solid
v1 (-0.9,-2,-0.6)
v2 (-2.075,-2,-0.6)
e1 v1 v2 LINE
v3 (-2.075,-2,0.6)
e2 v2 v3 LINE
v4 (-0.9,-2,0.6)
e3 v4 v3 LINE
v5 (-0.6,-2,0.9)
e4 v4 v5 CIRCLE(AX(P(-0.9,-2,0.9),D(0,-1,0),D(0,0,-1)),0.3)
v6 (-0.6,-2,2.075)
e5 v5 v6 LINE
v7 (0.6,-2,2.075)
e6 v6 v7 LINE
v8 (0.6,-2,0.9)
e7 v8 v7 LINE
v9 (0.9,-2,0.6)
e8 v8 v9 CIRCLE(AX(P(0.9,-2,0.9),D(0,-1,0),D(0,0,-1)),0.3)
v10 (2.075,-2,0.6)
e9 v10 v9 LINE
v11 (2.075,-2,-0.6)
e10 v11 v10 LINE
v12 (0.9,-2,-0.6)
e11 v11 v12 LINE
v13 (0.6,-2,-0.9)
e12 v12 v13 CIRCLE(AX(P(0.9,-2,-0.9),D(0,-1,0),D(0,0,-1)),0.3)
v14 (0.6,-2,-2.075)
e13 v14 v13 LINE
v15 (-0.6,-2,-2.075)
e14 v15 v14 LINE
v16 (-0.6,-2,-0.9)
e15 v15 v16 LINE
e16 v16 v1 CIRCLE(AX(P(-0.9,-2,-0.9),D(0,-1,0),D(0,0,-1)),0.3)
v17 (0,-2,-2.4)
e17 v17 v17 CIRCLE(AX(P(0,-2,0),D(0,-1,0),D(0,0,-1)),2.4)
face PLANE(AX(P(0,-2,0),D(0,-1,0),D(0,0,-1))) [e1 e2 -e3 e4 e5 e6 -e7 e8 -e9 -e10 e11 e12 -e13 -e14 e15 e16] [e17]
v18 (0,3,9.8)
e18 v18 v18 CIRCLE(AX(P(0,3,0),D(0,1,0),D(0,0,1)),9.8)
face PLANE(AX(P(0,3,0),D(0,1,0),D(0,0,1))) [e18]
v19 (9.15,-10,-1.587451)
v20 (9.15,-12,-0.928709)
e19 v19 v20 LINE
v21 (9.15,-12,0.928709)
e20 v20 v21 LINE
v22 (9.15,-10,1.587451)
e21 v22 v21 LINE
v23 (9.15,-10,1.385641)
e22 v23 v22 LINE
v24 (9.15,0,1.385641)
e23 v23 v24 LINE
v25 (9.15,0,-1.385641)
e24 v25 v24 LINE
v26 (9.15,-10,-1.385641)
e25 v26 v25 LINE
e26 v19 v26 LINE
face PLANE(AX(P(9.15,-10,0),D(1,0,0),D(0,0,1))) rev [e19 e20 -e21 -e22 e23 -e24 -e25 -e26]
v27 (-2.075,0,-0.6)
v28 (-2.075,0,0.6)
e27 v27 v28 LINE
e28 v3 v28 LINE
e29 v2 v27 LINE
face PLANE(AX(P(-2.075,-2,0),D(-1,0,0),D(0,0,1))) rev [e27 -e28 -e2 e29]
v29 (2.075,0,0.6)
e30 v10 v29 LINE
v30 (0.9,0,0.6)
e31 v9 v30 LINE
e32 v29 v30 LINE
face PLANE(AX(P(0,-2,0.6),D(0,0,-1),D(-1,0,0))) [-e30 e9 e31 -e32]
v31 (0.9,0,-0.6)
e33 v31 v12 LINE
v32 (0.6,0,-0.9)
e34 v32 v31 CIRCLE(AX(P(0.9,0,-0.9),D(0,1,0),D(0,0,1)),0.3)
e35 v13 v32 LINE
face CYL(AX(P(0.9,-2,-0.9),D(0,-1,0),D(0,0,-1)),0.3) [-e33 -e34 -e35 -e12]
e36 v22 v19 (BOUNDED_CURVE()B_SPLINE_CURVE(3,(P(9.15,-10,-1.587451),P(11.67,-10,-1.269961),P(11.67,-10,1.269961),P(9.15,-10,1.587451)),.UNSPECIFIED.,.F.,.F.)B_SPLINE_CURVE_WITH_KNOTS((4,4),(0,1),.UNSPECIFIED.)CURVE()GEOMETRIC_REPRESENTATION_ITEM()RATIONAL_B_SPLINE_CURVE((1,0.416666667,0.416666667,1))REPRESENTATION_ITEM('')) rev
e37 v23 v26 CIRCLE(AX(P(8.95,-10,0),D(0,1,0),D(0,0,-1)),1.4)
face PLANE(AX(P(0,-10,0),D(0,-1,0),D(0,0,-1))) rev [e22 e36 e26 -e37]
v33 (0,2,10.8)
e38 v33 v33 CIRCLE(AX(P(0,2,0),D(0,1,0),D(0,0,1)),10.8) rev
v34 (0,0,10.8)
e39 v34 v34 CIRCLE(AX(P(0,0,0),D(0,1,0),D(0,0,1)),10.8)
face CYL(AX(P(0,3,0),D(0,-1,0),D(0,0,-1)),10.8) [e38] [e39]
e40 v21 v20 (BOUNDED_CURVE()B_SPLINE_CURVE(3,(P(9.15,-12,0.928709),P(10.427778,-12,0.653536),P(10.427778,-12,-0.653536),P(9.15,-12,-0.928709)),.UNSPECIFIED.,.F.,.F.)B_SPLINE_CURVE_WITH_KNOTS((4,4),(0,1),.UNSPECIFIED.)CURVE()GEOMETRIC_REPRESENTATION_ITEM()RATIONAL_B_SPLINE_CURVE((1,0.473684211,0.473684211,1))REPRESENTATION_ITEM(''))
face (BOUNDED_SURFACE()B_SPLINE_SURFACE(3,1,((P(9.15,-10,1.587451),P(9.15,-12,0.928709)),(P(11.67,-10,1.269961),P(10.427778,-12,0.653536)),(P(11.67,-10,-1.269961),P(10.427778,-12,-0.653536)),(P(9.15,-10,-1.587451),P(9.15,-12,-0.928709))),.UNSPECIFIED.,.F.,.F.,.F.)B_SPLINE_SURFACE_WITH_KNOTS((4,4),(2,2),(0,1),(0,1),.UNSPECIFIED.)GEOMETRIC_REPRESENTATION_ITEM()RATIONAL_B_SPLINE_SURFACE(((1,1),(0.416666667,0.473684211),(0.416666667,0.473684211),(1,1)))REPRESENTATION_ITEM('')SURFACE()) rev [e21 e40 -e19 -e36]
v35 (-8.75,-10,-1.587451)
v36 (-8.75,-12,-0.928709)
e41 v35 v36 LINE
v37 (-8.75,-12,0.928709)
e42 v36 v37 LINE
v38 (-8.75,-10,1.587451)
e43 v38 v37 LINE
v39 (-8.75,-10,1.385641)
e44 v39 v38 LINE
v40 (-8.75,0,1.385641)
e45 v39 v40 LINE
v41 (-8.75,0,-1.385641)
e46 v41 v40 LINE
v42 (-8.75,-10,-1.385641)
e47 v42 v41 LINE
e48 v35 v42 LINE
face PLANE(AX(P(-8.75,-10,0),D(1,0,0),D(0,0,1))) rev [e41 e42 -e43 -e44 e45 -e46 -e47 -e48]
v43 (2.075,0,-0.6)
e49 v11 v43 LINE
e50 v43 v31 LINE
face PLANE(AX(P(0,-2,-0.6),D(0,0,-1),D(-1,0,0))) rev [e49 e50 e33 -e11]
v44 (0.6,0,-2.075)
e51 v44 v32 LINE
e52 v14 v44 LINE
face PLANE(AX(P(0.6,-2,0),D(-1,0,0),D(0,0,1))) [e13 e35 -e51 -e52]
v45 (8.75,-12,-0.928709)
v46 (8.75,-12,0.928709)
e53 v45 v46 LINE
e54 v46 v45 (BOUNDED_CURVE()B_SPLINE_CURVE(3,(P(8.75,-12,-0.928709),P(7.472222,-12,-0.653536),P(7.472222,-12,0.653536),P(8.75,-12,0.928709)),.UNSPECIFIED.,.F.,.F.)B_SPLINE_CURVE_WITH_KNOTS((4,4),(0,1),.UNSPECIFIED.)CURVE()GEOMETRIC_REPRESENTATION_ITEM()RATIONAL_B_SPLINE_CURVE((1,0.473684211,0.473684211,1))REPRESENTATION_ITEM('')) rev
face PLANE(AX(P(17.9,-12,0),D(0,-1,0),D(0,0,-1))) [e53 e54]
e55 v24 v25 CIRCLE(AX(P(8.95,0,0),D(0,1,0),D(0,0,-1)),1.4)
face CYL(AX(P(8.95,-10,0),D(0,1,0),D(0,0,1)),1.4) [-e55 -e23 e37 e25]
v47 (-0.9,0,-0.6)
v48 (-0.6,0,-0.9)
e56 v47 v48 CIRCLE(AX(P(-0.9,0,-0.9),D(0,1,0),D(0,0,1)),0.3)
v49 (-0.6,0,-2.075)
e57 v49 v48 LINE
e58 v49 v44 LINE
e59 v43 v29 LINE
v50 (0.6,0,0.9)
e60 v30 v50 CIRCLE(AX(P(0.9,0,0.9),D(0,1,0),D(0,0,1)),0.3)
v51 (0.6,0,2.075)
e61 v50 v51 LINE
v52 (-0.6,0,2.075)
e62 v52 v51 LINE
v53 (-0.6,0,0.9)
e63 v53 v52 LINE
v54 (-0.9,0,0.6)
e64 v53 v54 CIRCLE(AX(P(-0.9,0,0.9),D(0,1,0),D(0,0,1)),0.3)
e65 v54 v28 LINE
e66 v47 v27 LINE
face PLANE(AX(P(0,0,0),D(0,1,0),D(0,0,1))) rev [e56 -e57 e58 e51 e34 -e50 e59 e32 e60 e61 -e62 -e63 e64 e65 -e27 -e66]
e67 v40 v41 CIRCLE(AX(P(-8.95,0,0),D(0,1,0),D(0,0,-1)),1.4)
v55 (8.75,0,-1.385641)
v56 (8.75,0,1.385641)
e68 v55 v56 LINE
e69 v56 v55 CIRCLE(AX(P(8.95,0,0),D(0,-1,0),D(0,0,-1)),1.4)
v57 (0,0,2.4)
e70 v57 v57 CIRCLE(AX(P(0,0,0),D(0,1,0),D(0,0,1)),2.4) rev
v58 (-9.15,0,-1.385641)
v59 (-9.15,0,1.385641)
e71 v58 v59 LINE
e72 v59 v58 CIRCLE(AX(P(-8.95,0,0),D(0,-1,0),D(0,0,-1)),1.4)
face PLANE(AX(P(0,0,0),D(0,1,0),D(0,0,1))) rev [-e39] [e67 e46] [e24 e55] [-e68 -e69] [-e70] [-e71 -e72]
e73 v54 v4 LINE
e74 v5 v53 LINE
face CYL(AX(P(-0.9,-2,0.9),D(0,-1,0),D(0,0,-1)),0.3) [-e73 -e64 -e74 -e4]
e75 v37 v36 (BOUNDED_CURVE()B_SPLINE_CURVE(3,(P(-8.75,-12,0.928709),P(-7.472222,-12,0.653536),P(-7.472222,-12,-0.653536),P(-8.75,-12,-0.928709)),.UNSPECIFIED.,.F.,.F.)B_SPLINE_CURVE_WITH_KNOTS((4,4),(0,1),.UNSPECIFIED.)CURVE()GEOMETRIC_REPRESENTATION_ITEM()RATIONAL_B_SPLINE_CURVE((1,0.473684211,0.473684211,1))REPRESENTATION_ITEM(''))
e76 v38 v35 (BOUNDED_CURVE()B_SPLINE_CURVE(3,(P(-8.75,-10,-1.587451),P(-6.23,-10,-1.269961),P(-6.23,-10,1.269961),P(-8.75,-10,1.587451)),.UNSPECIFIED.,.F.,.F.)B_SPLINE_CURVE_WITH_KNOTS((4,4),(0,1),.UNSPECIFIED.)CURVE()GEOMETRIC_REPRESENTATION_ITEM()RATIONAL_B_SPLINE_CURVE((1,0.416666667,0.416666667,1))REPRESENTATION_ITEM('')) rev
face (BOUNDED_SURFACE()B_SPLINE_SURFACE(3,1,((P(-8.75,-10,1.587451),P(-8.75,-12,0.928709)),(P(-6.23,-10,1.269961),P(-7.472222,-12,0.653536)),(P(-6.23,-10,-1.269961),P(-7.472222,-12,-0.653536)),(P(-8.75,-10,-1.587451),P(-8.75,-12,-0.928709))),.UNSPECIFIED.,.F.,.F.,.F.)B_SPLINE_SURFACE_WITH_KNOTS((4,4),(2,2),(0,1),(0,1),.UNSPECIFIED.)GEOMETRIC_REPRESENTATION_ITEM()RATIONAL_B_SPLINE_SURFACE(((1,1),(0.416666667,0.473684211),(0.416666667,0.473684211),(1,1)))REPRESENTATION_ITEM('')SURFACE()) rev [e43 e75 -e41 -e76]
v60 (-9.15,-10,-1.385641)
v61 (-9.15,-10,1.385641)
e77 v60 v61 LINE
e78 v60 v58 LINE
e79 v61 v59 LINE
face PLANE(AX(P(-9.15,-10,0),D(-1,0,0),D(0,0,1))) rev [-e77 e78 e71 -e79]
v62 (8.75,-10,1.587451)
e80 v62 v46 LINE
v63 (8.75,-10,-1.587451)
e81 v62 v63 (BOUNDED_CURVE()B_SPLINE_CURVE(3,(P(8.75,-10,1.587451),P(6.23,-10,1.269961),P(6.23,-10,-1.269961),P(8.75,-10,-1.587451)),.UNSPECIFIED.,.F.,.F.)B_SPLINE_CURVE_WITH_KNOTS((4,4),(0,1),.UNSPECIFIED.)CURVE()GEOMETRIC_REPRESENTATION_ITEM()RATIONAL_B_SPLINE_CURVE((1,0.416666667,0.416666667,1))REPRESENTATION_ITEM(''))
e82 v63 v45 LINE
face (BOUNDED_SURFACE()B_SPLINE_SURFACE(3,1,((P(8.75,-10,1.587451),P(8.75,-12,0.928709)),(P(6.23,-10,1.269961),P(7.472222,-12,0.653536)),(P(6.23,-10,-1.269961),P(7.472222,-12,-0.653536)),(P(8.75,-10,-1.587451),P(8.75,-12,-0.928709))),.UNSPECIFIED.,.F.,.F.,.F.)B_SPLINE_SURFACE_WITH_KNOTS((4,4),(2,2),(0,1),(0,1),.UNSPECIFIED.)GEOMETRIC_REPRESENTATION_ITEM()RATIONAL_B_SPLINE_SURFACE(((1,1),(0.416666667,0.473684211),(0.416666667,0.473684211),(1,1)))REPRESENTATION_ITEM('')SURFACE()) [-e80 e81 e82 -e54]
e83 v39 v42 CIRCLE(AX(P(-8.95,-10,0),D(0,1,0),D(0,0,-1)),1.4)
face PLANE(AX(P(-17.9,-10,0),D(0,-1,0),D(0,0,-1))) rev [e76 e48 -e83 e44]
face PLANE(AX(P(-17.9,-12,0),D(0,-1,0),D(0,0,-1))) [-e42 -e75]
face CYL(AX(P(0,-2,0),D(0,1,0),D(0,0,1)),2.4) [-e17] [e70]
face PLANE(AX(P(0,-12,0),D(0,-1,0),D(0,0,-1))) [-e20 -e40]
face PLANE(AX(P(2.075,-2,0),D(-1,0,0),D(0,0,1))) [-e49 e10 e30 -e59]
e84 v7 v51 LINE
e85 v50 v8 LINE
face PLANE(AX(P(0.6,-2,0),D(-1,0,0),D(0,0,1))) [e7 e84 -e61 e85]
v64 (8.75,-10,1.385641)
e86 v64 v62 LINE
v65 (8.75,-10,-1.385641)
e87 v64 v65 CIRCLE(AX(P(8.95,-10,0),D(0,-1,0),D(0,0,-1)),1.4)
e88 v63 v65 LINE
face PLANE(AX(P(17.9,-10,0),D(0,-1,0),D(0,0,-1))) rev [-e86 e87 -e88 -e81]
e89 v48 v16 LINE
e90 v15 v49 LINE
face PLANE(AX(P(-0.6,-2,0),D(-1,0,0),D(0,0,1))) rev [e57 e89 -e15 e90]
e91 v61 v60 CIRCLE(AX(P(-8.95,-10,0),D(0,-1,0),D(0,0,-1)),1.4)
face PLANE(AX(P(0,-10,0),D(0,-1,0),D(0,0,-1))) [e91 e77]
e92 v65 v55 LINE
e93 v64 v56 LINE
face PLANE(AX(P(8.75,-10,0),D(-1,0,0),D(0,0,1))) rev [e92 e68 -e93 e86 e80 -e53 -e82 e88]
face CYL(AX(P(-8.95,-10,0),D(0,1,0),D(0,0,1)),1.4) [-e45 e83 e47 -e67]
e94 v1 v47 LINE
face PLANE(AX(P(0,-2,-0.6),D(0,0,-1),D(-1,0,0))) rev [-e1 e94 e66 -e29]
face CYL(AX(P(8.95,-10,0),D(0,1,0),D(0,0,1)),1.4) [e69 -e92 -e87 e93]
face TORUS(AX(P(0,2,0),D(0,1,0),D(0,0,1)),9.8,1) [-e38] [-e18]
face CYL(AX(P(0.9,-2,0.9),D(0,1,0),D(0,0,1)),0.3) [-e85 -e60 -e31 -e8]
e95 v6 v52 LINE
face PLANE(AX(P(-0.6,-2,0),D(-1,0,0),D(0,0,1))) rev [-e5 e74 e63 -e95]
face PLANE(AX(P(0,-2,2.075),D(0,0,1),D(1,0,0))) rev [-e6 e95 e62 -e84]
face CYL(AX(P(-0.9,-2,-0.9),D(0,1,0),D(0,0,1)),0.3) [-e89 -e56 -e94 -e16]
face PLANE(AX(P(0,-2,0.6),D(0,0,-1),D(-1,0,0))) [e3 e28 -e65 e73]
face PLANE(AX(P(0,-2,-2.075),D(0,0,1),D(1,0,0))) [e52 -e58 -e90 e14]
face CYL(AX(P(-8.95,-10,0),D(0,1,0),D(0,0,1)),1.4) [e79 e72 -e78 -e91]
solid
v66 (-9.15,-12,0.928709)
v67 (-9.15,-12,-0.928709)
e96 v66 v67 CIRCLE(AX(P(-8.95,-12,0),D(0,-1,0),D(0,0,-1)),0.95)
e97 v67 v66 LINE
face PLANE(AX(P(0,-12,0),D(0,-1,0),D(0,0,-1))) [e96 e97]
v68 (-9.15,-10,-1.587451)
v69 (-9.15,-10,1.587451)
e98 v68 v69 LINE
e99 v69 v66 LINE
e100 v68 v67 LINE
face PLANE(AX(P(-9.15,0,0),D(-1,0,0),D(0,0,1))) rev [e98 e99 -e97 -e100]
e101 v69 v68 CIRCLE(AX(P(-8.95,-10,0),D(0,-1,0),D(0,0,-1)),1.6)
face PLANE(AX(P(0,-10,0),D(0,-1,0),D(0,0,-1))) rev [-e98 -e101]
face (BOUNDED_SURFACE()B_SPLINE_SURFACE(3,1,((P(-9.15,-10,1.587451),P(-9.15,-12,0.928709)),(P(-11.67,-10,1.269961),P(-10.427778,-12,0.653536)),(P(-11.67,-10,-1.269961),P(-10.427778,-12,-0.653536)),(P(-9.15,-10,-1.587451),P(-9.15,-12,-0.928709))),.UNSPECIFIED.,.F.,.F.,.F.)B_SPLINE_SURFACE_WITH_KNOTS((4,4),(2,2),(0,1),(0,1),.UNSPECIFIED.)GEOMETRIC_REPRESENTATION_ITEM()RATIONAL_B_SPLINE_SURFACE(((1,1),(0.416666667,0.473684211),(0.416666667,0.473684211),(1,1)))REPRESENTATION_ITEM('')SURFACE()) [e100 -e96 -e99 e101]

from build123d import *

# Parameters (mm, degrees)
SKETCH1_R           = 10.8
BOSS_EXTRUDE1_DEPTH = 3
BOSS_EXTRUDE3_DEPTH = 10
MIRROR3_START       = -10
MIRROR3_DEPTH       = 10
FILLET1_R           = 1
SKETCH6_R           = 2.4
BOSS_EXTRUDE4_DEPTH = 2
FILLET2_R           = 0.3


with BuildPart() as part:
    # Sketch1 → Boss-Extrude1 (new body)
    with BuildSketch(Plane(origin=(0, 0, 0), x_dir=(1, 0, 0), z_dir=(0, 1, 0))):
        with Locations(Location((0, 0, 0), (0, 0, 270))):
            Circle(SKETCH1_R)
    extrude(amount=BOSS_EXTRUDE1_DEPTH)

    # Sketch2 → Boss-Extrude3 (add)
    with BuildSketch(Plane.XZ):
        with BuildLine():
            Line((-9.15, 0), (-9.15, 1.385640646))
            ThreePointArc((-9.15, 1.385640646), (-10.35, 0), (-9.15, -1.385640646))
            Line((-9.15, -1.385640646), (-9.15, 0))
        make_face()
    boss_extrude3 = extrude(amount=BOSS_EXTRUDE3_DEPTH)


with BuildPart() as body_2:
    # Loft3: read off the stored shape, not the designer's step
    # Loft3: loft between two sections, ruled curve by curve
    loft3_from = [
        Edge.make_bspline([(-9.15, -10, 1.587450787), (-11.67, -10, 1.269960629), (-11.67, -10, -1.269960629), (-9.15, -10, -1.587450787)], [0, 0, 0, 0, 1, 1, 1, 1], 3, [1, 0.416666667, 0.416666667, 1]),
        Edge.make_line((-9.15, -10, 1.587450787), (-9.15, -10, -1.587450787)),
    ]
    loft3_to = [
        Edge.make_bspline([(-9.15, -12, 0.928708781), (-10.427777778, -12, 0.653535809), (-10.427777778, -12, -0.653535809), (-9.15, -12, -0.928708781)], [0, 0, 0, 0, 1, 1, 1, 1], 3, [1, 0.473684211, 0.473684211, 1]),
        Edge.make_line((-9.15, -12, 0.928708781), (-9.15, -12, -0.928708781)),
    ]
    loft3 = Solid(Shell([*[Face.make_surface_from_curves(loft3_from[k], loft3_to[k]) for k in range(2)], Face(Wire(loft3_from)), Face(Wire(loft3_to))]))
    add(loft3)


with BuildPart() as part_1:
    add(part.part)

    # Mirror2: Boss-Extrude3, Loft3 across plane
    add(boss_extrude3.mirror(Plane(origin=(-8.95, 0, 0), x_dir=(0, 0, 1), z_dir=(1, 0, 0))))
    add(loft3.mirror(Plane(origin=(-8.95, 0, 0), x_dir=(0, 0, 1), z_dir=(1, 0, 0))))

    # Mirror3: read off the stored shape, not the designer's step
    # Mirror3 outline → Mirror3 (add)
    with BuildSketch(Plane(origin=(0, 0, 0), x_dir=(1, 0, 0), z_dir=(0, 1, 0)).offset(MIRROR3_START)):
        with BuildLine():
            Line((9.15, 1.385640646), (9.15, -1.385640646))
            ThreePointArc((9.15, -1.385640646), (10.35, 0), (9.15, 1.385640646))
        make_face()
        with BuildLine():
            Line((8.75, -1.385640646), (8.75, 1.385640646))
            ThreePointArc((8.75, 1.385640646), (7.55, 0), (8.75, -1.385640646))
        make_face()
    extrude(amount=MIRROR3_DEPTH)

    # Mirror3 2: loft between two sections, ruled curve by curve
    mirror3_2_from = [
        Edge.make_bspline([(8.75, -10, 1.587450787), (6.23, -10, 1.269960629), (6.23, -10, -1.269960629), (8.75, -10, -1.587450787)], [0, 0, 0, 0, 1, 1, 1, 1], 3, [1, 0.416666667, 0.416666667, 1]),
        Edge.make_line((8.75, -10, -1.587450787), (8.75, -10, 1.587450787)),
    ]
    mirror3_2_to = [
        Edge.make_bspline([(8.75, -12, 0.928708781), (7.472222222, -12, 0.653535809), (7.472222222, -12, -0.653535809), (8.75, -12, -0.928708781)], [0, 0, 0, 0, 1, 1, 1, 1], 3, [1, 0.473684211, 0.473684211, 1]),
        Edge.make_line((8.75, -12, -0.928708781), (8.75, -12, 0.928708781)),
    ]
    mirror3_2 = Solid(Shell([*[Face.make_surface_from_curves(mirror3_2_from[k], mirror3_2_to[k]) for k in range(2)], Face(Wire(mirror3_2_from)), Face(Wire(mirror3_2_to))]))
    add(mirror3_2)

    # Mirror3 3: loft between two sections, ruled curve by curve
    mirror3_3_from = [
        Edge.make_bspline([(9.15, -10, 1.587450787), (11.67, -10, 1.269960629), (11.67, -10, -1.269960629), (9.15, -10, -1.587450787)], [0, 0, 0, 0, 1, 1, 1, 1], 3, [1, 0.416666667, 0.416666667, 1]),
        Edge.make_line((9.15, -10, -1.587450787), (9.15, -10, 1.587450787)),
    ]
    mirror3_3_to = [
        Edge.make_bspline([(9.15, -12, 0.928708781), (10.427777778, -12, 0.653535809), (10.427777778, -12, -0.653535809), (9.15, -12, -0.928708781)], [0, 0, 0, 0, 1, 1, 1, 1], 3, [1, 0.473684211, 0.473684211, 1]),
        Edge.make_line((9.15, -12, -0.928708781), (9.15, -12, 0.928708781)),
    ]
    mirror3_3 = Solid(Shell([*[Face.make_surface_from_curves(mirror3_3_from[k], mirror3_3_to[k]) for k in range(2)], Face(Wire(mirror3_3_from)), Face(Wire(mirror3_3_to))]))
    add(mirror3_3)

    # Fillet1
    fillet1_edges = [part_1.edges().sort_by_distance(p)[0] for p in [
        (0, 3, -10.8),
    ]]
    fillet(fillet1_edges, radius=FILLET1_R)

    # Sketch6 → Boss-Extrude4 (add)
    with BuildSketch(Plane.XZ):
        with Locations(Location((0, 0, 0), (0, 0, 90))):
            Circle(SKETCH6_R)
        Polygon((2.075, 0.6), (2.075, -0.6), (0.6, -0.6), (0.6, -2.075), (-0.6, -2.075), (-0.6, -0.6), (-2.075, -0.6), (-2.075, 0.6), (-0.6, 0.6), (-0.6, 2.075), (0.6, 2.075), (0.6, 0.6), align=None, mode=Mode.SUBTRACT)
    extrude(amount=BOSS_EXTRUDE4_DEPTH)

    # Fillet2
    fillet2_edges = [part_1.edges().sort_by_distance(p)[0] for p in [
        (0.6, -1, -0.6),
        (-0.6, -1, -0.6),
        (-0.6, -1, 0.6),
        (0.6, -1, 0.6),
    ]]
    fillet(fillet2_edges, radius=FILLET2_R)


solid = Compound([body_2.part, part_1.part])
